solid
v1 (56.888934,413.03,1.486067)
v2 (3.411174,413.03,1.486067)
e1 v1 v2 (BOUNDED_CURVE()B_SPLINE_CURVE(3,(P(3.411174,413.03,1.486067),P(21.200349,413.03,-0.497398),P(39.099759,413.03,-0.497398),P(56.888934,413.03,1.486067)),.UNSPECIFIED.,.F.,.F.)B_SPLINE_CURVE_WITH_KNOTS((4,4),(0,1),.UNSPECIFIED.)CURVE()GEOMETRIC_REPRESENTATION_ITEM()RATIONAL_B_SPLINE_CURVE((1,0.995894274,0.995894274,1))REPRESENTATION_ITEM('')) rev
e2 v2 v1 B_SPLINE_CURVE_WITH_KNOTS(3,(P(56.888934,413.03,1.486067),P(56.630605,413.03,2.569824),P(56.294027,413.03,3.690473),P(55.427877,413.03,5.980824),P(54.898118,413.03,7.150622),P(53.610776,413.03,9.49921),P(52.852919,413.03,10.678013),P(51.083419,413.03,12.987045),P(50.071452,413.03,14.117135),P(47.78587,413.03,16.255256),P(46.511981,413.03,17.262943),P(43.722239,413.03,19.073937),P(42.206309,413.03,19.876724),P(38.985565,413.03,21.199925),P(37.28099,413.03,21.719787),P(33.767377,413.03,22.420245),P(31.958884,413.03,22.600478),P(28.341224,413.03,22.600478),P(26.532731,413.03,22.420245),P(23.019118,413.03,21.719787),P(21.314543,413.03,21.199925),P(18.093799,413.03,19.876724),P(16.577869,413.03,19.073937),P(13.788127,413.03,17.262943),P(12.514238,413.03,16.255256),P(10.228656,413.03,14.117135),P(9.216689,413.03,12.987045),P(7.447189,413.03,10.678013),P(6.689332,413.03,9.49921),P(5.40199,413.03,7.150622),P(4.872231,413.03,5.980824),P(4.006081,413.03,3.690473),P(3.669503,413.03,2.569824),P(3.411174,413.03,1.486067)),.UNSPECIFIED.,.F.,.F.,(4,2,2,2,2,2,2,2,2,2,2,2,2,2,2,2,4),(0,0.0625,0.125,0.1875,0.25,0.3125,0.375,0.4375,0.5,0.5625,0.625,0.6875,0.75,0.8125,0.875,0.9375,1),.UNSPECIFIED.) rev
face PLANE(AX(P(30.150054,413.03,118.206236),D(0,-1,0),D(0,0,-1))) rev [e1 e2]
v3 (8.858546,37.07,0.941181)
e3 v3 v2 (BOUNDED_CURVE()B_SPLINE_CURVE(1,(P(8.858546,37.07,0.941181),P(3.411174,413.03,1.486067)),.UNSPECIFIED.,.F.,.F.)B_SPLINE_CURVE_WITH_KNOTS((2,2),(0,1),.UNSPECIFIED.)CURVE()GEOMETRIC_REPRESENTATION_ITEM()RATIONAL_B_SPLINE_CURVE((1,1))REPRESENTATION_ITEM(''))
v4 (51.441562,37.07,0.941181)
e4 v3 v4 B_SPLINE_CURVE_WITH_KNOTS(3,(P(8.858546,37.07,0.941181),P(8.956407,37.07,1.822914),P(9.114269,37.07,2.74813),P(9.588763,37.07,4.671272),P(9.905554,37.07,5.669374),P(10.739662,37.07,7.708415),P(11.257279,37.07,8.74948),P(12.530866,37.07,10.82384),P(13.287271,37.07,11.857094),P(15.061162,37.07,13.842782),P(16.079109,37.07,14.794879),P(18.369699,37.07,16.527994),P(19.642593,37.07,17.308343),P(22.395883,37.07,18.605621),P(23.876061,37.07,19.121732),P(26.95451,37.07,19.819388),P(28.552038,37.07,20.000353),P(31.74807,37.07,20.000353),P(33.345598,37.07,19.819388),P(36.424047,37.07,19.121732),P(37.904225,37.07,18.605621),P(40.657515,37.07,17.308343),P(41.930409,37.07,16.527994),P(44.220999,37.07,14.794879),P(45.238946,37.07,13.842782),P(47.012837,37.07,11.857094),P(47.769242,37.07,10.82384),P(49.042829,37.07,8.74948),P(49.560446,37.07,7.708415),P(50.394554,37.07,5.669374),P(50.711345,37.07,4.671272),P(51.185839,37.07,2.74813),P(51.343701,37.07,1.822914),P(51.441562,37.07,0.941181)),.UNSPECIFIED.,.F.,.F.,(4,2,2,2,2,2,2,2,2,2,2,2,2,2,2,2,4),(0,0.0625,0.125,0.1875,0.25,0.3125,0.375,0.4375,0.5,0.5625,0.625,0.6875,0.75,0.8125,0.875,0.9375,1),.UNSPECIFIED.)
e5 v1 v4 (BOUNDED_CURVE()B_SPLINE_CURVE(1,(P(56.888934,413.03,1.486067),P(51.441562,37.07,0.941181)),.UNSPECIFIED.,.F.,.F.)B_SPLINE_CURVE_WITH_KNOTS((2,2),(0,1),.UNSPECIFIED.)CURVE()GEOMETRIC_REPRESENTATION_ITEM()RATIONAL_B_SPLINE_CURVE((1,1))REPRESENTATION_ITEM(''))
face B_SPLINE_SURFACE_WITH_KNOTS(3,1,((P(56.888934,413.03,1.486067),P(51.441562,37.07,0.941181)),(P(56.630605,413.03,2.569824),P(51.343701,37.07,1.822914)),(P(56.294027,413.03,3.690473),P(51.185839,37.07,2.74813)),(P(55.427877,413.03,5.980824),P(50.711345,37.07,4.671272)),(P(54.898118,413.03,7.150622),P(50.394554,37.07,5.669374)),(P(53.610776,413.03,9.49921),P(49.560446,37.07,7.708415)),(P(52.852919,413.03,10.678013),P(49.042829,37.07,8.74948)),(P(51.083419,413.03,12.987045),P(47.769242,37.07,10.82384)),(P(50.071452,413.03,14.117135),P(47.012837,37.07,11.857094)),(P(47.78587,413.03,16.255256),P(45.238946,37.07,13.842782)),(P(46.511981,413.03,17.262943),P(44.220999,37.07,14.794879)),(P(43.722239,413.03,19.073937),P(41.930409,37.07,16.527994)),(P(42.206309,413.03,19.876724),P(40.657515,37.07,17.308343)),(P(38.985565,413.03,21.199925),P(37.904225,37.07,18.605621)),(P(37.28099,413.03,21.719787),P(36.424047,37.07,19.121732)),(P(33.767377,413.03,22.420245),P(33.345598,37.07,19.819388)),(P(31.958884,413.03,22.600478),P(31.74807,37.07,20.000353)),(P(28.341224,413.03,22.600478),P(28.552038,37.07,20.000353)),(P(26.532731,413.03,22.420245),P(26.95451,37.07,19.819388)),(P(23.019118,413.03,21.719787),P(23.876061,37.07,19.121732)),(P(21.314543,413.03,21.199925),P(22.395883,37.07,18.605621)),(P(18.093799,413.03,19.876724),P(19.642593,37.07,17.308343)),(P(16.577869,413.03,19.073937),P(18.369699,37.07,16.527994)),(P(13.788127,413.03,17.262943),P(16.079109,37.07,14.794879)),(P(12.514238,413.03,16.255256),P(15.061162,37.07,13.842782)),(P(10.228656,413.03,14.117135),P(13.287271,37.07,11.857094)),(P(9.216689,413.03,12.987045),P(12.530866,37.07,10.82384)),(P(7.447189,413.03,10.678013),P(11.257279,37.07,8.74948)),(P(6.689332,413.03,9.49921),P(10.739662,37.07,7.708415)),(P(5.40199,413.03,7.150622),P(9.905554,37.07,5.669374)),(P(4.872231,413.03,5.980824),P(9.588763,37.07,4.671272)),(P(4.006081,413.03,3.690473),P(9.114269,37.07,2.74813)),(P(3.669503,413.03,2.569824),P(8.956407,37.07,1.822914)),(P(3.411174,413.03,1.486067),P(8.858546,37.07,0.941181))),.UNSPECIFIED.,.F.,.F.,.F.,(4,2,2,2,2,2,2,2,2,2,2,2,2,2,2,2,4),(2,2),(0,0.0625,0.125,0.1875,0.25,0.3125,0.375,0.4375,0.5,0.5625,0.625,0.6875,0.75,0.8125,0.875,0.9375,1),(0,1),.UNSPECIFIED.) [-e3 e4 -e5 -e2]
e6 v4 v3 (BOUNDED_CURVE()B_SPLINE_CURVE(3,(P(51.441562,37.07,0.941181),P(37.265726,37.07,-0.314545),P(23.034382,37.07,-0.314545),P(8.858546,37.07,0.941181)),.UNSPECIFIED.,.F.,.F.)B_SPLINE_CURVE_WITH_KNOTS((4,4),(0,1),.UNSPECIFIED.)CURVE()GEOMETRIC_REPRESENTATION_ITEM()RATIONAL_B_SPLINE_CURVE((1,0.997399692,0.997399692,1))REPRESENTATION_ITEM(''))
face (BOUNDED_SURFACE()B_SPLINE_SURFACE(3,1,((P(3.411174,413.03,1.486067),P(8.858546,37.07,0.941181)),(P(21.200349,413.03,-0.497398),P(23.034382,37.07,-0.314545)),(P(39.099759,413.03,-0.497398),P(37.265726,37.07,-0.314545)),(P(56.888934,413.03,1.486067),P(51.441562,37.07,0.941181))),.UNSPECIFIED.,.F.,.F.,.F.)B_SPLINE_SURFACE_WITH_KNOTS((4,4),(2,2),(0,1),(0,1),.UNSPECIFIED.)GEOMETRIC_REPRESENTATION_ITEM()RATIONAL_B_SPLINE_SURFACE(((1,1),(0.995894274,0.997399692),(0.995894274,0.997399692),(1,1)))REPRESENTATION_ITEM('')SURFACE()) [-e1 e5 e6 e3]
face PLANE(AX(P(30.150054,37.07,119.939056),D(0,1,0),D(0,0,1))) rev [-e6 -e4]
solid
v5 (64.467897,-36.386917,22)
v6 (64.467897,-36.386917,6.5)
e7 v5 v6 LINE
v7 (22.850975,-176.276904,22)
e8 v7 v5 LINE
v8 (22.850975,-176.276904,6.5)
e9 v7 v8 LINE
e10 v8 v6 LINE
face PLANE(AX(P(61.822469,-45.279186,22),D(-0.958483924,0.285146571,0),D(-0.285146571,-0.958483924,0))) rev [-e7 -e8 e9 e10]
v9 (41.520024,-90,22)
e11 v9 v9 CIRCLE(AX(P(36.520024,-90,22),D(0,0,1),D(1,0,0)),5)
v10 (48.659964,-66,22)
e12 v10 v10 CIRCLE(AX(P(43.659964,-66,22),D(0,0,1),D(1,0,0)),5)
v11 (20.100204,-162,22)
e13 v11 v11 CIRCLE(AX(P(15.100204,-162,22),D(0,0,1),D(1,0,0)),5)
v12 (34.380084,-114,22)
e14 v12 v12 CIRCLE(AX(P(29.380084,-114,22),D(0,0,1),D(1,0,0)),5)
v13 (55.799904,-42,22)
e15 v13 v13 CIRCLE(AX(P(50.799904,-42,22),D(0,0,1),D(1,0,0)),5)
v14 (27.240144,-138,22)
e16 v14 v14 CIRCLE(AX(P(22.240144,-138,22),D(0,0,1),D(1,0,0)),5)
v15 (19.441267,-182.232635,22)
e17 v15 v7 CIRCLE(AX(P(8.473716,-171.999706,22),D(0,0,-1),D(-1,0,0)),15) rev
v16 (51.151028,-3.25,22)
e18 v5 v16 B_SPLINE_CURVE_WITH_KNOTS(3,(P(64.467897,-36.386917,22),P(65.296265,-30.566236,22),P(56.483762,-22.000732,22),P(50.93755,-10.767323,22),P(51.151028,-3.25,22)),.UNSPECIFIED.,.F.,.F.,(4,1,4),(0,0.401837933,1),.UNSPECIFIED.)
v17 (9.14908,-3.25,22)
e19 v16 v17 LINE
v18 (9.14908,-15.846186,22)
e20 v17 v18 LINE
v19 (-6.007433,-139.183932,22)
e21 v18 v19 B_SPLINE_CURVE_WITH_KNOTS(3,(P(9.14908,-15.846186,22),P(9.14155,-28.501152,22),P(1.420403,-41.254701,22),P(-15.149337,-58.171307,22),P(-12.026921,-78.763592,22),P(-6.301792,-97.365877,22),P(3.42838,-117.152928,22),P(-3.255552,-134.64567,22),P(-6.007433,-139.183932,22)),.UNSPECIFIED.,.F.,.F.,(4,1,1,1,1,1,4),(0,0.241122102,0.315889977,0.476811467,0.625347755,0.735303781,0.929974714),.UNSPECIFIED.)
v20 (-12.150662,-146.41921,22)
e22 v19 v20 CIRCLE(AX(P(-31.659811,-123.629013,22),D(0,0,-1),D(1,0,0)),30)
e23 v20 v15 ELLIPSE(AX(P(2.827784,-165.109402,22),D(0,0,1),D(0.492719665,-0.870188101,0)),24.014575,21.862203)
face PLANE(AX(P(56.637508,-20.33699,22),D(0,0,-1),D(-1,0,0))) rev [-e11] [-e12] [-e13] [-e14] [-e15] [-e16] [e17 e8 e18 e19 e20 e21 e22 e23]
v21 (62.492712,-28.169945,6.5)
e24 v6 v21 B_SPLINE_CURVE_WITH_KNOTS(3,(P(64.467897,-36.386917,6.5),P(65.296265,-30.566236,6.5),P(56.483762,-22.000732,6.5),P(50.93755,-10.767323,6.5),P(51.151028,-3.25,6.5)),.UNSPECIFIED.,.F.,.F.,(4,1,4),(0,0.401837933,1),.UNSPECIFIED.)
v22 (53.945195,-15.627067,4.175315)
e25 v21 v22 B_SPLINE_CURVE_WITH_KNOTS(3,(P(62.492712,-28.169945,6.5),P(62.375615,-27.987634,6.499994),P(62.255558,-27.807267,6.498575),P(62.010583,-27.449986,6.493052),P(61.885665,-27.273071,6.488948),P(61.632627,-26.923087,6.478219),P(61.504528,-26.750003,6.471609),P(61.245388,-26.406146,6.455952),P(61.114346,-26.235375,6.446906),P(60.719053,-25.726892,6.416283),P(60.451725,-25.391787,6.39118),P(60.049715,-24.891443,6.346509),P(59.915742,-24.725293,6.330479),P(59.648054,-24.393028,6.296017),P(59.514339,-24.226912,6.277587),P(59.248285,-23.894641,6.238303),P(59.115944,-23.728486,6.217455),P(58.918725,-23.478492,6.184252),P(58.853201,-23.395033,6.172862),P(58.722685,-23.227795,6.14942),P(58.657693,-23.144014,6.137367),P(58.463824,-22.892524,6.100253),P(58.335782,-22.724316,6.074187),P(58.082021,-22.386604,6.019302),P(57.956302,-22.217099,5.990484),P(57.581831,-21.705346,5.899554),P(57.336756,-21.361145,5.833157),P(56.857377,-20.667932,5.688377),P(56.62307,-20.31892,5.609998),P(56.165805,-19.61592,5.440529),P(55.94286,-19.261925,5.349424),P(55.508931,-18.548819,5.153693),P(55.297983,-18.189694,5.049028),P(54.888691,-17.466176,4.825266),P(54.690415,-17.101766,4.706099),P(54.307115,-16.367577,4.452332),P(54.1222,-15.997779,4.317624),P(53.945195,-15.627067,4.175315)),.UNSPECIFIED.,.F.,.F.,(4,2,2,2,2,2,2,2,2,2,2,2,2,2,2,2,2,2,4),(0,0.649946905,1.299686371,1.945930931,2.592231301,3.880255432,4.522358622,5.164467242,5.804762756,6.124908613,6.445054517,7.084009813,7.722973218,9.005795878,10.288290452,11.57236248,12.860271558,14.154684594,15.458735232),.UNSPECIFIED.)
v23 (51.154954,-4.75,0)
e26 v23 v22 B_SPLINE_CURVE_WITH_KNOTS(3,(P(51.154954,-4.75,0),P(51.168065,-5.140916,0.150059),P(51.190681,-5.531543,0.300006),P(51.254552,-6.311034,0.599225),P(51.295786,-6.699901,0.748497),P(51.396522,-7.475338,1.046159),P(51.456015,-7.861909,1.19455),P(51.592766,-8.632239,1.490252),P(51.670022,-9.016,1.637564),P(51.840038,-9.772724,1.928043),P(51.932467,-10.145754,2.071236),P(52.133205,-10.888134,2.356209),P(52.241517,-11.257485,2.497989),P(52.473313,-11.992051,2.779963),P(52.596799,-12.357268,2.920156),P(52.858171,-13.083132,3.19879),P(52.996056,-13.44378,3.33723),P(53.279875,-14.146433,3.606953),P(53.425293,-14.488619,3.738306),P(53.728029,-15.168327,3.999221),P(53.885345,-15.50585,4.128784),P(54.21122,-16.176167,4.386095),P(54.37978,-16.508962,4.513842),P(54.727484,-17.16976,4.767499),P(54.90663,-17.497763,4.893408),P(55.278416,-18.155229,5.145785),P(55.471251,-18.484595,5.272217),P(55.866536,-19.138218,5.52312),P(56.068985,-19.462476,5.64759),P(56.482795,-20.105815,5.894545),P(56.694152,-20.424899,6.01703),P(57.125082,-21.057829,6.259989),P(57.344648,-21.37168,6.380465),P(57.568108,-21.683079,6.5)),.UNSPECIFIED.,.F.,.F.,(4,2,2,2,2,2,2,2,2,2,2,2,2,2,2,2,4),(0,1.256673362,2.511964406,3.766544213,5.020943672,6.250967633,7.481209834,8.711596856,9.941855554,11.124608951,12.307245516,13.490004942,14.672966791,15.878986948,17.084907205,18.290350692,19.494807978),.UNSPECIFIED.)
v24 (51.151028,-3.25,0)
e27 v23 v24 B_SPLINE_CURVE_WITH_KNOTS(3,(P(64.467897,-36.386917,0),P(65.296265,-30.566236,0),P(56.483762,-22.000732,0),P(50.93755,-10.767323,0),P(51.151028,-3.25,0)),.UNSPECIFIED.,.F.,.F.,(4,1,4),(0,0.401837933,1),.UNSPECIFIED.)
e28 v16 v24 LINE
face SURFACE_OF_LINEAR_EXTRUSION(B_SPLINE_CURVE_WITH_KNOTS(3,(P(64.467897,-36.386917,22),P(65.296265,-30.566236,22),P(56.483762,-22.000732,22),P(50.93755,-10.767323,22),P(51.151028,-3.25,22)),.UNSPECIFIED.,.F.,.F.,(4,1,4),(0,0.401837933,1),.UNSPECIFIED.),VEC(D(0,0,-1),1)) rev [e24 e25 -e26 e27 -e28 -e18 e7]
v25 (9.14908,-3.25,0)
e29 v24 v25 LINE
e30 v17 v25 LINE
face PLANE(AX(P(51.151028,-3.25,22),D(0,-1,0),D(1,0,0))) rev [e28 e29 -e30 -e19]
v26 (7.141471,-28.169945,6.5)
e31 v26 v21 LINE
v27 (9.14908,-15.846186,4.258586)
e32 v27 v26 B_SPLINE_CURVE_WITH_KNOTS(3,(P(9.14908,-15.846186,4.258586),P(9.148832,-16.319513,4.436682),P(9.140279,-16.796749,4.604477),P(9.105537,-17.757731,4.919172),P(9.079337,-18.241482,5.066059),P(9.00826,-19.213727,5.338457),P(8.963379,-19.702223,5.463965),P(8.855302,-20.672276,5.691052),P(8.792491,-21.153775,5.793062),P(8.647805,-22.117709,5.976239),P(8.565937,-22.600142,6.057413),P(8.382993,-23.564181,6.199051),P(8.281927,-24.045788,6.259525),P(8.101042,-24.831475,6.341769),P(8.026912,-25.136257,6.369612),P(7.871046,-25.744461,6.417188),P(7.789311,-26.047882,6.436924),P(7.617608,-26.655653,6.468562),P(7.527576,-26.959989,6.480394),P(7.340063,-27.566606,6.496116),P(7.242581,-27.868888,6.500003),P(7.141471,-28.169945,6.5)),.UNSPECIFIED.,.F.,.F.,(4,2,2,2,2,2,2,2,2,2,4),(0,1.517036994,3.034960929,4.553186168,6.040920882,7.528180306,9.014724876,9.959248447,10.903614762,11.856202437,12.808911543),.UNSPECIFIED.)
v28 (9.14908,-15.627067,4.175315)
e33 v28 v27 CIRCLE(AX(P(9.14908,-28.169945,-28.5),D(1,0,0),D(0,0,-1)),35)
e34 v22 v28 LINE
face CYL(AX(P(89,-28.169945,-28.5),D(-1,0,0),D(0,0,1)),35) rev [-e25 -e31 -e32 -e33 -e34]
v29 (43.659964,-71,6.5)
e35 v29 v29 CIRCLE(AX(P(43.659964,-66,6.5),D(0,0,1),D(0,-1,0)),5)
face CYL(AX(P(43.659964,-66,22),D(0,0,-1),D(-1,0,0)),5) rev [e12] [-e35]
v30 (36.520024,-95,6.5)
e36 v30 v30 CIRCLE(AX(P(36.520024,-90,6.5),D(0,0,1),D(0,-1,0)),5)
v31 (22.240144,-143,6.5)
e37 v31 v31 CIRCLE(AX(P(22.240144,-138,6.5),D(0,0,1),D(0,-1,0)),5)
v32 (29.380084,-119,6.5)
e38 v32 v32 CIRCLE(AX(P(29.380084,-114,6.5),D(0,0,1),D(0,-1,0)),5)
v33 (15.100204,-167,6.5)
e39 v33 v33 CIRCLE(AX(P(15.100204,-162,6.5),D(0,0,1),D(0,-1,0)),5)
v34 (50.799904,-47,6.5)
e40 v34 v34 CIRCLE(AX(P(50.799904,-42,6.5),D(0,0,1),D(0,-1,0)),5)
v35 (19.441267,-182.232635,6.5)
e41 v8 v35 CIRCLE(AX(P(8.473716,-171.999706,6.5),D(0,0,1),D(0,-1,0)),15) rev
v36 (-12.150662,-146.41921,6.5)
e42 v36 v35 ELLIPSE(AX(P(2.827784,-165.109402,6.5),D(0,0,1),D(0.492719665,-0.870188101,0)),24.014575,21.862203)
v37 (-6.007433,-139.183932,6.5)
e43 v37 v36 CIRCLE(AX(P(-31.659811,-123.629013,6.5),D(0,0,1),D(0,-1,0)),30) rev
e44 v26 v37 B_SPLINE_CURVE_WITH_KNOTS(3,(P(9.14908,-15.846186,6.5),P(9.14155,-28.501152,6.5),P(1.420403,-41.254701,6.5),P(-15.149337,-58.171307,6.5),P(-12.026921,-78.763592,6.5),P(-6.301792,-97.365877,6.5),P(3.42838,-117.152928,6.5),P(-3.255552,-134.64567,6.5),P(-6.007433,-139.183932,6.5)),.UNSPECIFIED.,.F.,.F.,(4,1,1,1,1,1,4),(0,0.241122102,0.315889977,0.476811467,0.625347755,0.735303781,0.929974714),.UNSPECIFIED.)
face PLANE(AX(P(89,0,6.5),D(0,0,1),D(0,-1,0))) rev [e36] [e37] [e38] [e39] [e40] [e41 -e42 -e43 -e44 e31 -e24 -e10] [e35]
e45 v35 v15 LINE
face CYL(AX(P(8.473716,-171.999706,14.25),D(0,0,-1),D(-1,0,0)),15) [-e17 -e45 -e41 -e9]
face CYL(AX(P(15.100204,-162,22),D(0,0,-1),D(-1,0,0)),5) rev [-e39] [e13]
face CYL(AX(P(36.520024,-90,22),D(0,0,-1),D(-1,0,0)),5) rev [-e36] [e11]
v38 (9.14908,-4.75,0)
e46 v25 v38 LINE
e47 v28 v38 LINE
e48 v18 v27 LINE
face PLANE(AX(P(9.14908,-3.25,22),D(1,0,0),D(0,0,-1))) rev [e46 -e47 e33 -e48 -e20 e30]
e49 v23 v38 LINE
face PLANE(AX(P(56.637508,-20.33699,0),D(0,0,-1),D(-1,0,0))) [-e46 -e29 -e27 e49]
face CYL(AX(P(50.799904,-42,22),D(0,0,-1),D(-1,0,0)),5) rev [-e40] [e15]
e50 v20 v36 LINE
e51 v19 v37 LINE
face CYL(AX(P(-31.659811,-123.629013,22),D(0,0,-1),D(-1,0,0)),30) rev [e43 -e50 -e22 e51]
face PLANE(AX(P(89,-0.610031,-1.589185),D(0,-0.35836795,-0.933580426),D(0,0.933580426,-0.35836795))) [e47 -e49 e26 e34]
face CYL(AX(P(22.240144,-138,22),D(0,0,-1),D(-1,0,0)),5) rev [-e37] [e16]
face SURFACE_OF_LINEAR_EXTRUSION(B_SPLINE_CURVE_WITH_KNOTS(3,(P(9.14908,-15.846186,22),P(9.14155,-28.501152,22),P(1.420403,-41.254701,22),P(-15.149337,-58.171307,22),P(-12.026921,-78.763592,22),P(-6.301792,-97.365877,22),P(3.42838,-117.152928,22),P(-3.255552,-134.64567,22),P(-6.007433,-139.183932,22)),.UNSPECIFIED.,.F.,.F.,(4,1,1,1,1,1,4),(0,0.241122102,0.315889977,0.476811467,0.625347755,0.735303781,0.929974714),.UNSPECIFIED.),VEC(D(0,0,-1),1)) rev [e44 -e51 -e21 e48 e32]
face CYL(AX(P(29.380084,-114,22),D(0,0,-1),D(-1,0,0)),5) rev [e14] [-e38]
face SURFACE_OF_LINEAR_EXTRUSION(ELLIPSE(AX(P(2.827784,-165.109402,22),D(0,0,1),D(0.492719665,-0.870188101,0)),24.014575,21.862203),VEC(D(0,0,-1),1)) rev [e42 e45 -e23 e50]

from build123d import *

# Parameters (mm, degrees)
SKETCH7_R               = 5
BOSS_EXTRUDE1_DEPTH     = 22
CUT_EXTRUDE1_DEPTH      = 89
CUT_EXTRUDE1_DEPTH_BACK = 47
FILLET1_R               = 35
FILLET2_START           = 6
FILLET2_DEPTH           = 17


with BuildPart() as part:
    # Sketch4 for Loft1 → Loft1 section 0
    with BuildSketch(Plane(origin=(0, 413.03, 0), x_dir=(1, 0, 0), z_dir=(0, 1, 0))):
        with BuildLine():
            # circular arc as an exact rational Bezier (weights 1, cos(half-angle), 1)
            Bezier((3.411173818, -1.486067363), (30.150054, 1.495276154), (56.888934182, -1.486067363), weights=[1, 0.993841412, 1])
            Bezier((56.888934182, -1.486067363), (30.150054, -113.662589607), (3.411173818, -1.486067363), weights=[1, 0.231868224, 1])
        make_face()
    # Sketch2 for Loft1 → Loft1 section 1
    with BuildSketch(Plane(origin=(0, 37.07, 0), x_dir=(1, 0, 0), z_dir=(0, 1, 0))):
        with BuildLine():
            Bezier((51.441561571, -0.941181345), (30.150054, 0.944866761), (8.858546429, -0.941181345), weights=[1, 0.996099539, 1])
            Bezier((8.858546429, -0.941181345), (30.150054, -192.779980086), (51.441561571, -0.941181345), weights=[1, 0.110309138, 1])
        make_face()
    loft()


with BuildPart() as body_2:
    # Sketch7 → Boss-Extrude1 (new body)
    with BuildSketch(Plane.XY):
        with BuildLine():
            Line((61.822469128, -45.279185569), (26.122769128, -165.279185569))
            Line((26.122769128, -165.279185569), (22.169953883, -178.566071157))
            add(Edge.make_bspline(
                [(-12.150661674, -146.419210188), (-31.612509099, -163.079183622), (-11.324326994, -182.08237919), (8.963855111, -201.085574758), (22.169953883, -178.566071157)],
                knots=[3.317459121, 3.317459121, 3.317459121, 5.043045062, 5.043045062, 6.768631003, 6.768631003, 6.768631003], degree=2, weights=[1, 0.650318294, 1, 0.650318294, 1]))
            ThreePointArc((-12.150661674, -146.419210188), (-8.791094197, -143.046061953), (-6.007432727, -139.183931522))
            add(Edge.make_bspline(
                [(9.14908, -15.846186083), (9.141550363, -28.501152073), (1.420403196, -41.2547005), (-15.149336893, -58.17130706), (-12.026921138, -78.76359191), (-6.30179243, -97.365876925), (3.428380257, -117.152927923), (-3.255551817, -134.645669988), (-6.007432727, -139.183931522)],
                knots=[0, 0, 0, 0, 0.241122102, 0.315889977, 0.476811467, 0.625347755, 0.735303781, 0.929974714, 0.929974714, 0.929974714, 0.929974714], degree=3))
            Line((9.14908, -15.846186083), (9.14908, -3.25))
            Line((9.14908, -3.25), (51.151028, -3.25))
            add(Edge.make_bspline(
                [(51.151028, -3.25), (50.937550111, -10.767323465), (56.483762161, -22.000731952), (65.296265302, -30.566236086), (64.46789676, -36.386917125)],
                knots=[0, 0, 0, 0, 0.598162067, 1, 1, 1, 1], degree=3))
            Line((64.46789676, -36.386917125), (61.822469128, -45.279185569))
        make_face()
        with Locations((50.799904, -42)):
            Circle(SKETCH7_R, mode=Mode.SUBTRACT)
        with Locations((43.659964, -66)):
            Circle(SKETCH7_R, mode=Mode.SUBTRACT)
        with Locations((36.520024, -90)):
            Circle(SKETCH7_R, mode=Mode.SUBTRACT)
        with Locations((29.380084, -114)):
            Circle(SKETCH7_R, mode=Mode.SUBTRACT)
        with Locations((22.240144, -138)):
            Circle(SKETCH7_R, mode=Mode.SUBTRACT)
        with Locations((15.100204, -162)):
            Circle(SKETCH7_R, mode=Mode.SUBTRACT)
    extrude(amount=BOSS_EXTRUDE1_DEPTH)

    # Sketch9 → Cut-Extrude1 (cut, two sides: drawn at the far end of the back side and taken through both)
    with BuildSketch(Plane(origin=(0, 0, 0), x_dir=(0, 0, -1), z_dir=(1, 0, 0)).offset(-CUT_EXTRUDE1_DEPTH_BACK)):
        Polygon((0, -4.75), (0, -188.619559547), (-6.5, -188.619559547), (-6.5, -21.683078921), align=None)
    extrude(amount=CUT_EXTRUDE1_DEPTH + CUT_EXTRUDE1_DEPTH_BACK, mode=Mode.SUBTRACT)

    # Fillet1
    fillet1_edges = [body_2.edges().sort_by_distance(p)[0] for p in [
        (33.140560044, -21.683078921, 6.5),
    ]]
    fillet(fillet1_edges, radius=FILLET1_R)

    # Fillet2: read off the stored shape, not the designer's step
    # Fillet2 outline → Fillet2 (cut)
    with BuildSketch(Plane.XY.offset(FILLET2_START)):
        with BuildLine():
            Line((22.169953883, -178.566071157), (22.850975257, -176.276904444))
            ThreePointArc((22.850975257, -176.276904444), (21.491301478, -179.452388519), (19.441266868, -182.232634909))
            add(Edge.make_bspline(
                [(19.441266868, -182.232634909), (20.998606375, -180.56349408), (22.169953883, -178.566071157)],
                knots=[6.54399072, 6.54399072, 6.54399072, 6.768631003, 6.768631003, 6.768631003], degree=2, weights=[0.920807815, 0.954477725, 1]))
        make_face()
    extrude(amount=FILLET2_DEPTH, mode=Mode.SUBTRACT)


solid = Compound([part.part, body_2.part])
